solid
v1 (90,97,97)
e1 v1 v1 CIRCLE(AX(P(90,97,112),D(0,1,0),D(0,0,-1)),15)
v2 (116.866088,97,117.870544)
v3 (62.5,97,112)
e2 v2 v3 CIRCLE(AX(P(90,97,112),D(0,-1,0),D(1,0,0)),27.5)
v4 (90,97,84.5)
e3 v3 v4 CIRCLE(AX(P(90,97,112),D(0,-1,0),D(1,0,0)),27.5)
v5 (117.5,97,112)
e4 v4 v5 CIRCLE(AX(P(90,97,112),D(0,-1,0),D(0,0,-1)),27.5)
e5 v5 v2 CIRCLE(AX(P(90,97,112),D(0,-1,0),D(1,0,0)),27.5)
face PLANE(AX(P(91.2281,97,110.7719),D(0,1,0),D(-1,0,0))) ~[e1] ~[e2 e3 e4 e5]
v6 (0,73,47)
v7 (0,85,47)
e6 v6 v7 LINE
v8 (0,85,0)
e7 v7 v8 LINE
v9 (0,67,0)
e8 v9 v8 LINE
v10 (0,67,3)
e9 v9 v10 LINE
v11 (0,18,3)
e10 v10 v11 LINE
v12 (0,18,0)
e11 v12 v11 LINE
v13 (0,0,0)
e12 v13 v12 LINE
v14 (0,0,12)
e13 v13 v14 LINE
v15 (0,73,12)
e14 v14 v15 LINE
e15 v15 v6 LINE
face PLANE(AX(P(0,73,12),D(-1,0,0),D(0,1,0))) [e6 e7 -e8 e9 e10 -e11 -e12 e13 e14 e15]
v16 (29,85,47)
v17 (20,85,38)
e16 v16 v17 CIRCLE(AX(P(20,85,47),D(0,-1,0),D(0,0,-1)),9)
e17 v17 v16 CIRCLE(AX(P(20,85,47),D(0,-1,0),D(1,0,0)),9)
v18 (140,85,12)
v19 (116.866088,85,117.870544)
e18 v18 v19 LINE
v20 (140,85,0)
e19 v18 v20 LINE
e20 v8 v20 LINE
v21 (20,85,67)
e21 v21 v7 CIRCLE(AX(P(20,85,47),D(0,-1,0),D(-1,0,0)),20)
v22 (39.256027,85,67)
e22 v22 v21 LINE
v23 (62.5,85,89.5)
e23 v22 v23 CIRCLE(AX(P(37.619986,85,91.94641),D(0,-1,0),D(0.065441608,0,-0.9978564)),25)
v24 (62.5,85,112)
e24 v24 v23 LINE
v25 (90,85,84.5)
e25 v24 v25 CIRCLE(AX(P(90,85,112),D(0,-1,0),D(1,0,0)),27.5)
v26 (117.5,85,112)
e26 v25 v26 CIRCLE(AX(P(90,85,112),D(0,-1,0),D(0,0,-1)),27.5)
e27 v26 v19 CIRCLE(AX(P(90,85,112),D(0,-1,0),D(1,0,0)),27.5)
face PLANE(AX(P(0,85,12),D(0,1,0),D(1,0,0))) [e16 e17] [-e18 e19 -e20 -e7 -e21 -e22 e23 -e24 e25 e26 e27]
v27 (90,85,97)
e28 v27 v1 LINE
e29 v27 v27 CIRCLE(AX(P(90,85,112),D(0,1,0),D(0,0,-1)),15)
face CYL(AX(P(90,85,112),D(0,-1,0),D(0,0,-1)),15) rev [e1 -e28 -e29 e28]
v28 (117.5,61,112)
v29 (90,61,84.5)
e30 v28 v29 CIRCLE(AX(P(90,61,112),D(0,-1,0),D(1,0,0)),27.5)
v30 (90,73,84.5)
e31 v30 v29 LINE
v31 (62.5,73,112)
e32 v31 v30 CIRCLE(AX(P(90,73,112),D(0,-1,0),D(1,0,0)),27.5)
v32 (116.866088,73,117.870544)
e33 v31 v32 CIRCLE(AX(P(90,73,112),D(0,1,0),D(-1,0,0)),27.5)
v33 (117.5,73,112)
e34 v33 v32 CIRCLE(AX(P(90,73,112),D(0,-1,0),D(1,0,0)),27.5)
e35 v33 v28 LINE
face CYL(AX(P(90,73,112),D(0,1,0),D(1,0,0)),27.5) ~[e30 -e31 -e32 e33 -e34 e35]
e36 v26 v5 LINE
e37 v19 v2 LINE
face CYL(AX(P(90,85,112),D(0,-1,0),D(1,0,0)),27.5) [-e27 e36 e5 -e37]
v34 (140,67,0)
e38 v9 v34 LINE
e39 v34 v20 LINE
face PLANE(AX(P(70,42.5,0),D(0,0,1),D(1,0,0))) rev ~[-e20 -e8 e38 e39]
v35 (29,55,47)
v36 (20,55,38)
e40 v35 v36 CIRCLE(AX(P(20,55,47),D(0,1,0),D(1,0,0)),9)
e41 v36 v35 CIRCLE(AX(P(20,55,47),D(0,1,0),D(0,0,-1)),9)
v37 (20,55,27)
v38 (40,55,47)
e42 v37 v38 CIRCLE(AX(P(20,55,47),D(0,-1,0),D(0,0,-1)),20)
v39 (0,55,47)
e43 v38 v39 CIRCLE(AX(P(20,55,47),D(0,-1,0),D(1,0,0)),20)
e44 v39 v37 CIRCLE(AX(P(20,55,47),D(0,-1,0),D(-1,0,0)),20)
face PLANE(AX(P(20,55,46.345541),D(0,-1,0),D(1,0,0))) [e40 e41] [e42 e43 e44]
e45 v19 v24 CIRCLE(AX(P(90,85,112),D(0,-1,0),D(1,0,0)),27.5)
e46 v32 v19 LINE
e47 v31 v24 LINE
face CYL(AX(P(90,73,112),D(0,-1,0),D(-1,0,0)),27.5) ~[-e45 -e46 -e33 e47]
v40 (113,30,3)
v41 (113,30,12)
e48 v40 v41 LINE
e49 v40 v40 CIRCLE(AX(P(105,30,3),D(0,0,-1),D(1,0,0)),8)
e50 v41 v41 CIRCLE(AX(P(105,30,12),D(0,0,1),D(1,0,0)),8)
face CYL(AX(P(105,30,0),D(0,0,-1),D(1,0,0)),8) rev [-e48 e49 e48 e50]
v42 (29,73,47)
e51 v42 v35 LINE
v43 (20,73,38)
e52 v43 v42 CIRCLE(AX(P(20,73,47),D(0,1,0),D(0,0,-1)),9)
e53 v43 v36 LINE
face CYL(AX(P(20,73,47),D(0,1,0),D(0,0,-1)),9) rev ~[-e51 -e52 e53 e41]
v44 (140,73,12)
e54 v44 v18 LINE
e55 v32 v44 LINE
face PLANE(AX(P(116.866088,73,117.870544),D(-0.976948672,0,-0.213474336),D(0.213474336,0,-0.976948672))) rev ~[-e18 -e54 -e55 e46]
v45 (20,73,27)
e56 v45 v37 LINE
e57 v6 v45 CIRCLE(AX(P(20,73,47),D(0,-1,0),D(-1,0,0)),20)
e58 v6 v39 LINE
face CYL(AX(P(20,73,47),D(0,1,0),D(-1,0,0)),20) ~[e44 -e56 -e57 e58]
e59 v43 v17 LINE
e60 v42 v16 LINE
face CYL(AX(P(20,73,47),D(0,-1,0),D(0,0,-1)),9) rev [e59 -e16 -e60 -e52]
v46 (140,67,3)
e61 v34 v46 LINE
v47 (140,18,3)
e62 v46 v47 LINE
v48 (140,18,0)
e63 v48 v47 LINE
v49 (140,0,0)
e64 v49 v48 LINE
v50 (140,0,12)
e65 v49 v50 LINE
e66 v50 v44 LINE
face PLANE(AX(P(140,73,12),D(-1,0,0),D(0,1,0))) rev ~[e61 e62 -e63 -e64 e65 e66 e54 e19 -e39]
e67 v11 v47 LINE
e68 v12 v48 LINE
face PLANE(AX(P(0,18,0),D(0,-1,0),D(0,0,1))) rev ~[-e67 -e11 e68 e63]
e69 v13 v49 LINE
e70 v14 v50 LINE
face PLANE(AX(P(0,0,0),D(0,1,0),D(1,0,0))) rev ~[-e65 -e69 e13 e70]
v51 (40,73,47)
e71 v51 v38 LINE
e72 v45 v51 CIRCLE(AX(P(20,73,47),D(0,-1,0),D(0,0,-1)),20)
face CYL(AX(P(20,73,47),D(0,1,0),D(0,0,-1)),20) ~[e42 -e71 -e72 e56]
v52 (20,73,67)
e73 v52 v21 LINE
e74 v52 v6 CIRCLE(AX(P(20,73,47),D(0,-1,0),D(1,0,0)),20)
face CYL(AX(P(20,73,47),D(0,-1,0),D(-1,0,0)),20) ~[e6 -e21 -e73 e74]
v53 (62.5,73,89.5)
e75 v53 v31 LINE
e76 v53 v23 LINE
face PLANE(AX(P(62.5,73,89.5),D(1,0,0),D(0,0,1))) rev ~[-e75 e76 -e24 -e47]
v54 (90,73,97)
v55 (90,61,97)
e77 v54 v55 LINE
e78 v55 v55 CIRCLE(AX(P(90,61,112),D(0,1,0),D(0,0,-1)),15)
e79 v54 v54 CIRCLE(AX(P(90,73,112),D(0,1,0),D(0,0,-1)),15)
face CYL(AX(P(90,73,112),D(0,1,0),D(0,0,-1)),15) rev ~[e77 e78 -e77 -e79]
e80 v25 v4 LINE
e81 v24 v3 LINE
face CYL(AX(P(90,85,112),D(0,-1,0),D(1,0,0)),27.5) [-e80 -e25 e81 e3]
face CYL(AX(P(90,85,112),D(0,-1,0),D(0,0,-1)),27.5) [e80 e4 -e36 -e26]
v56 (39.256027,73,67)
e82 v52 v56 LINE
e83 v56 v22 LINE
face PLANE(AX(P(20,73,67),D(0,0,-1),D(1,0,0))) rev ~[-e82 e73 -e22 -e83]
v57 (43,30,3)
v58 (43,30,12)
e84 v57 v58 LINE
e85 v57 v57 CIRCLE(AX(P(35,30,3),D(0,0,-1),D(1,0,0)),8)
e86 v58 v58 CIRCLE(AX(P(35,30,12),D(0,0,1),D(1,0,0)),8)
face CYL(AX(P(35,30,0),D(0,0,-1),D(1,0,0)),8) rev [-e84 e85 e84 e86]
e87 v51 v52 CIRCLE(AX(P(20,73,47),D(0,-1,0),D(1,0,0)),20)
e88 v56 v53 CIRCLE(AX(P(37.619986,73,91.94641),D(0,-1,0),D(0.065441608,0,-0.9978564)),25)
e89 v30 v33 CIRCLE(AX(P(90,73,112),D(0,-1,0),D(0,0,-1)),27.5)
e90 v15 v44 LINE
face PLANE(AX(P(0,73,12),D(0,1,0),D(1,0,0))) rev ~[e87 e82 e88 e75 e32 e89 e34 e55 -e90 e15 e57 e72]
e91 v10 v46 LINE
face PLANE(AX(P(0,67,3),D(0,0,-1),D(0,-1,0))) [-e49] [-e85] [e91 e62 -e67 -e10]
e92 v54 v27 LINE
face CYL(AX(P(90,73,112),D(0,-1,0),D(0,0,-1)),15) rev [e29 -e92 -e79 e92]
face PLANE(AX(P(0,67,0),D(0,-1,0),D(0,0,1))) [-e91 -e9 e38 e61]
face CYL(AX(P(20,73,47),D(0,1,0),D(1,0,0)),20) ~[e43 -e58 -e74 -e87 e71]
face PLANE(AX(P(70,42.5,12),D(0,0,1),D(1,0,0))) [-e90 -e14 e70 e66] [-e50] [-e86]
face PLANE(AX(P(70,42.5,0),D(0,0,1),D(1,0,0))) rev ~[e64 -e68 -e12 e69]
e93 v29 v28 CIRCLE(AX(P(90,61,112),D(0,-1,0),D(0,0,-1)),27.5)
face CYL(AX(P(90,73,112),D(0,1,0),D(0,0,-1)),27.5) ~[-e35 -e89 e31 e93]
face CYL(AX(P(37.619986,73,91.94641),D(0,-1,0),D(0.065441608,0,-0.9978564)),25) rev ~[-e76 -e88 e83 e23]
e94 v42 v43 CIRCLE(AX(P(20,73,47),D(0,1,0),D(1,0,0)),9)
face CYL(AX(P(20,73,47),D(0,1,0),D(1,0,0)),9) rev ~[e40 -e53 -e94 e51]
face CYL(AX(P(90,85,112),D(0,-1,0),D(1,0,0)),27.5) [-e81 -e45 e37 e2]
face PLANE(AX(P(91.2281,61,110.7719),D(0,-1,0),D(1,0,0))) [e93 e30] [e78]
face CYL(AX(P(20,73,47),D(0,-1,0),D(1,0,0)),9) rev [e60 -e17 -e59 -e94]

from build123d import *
from build123d import SkipClean  # not in build123d's __all__

# Parameters (mm, degrees)
F0_W      = 140
F0_H      = 85
F0_R      = 8
F1_DEPTH  = 12
F2_W      = 140
F2_H      = 12
F3_DEPTH  = 130
F5_DEPTH  = 18
F7_DEPTH  = 12
F9_DEPTH  = 25
F10_DEPTH = 25
F11_W     = 49
F11_H     = 3
F12_DEPTH = 140.001


# Not quite as in the source:
# - after a boolean that leaves OpenCascade's solid faulty, fix() repairs it
# - a feature of the source that left no trace in its solid (it failed there, or was rolled back) is left out
# - a pattern or mirror of a feature is missing from the dataset's text; its kind, count and spacing are read off the source's solid


with BuildPart() as f1:
    # F0 (on Top) → F1 (new body)
    with BuildSketch(Plane.XY):
        with Locations((70, 42.5)):
            Rectangle(F0_W, F0_H)
        with Locations((35, 30)):
            Circle(F0_R, mode=Mode.SUBTRACT)
        with Locations((105, 30)):
            Circle(F0_R, mode=Mode.SUBTRACT)
    extrude(amount=F1_DEPTH)

    # F2 (on face) → F3 (join)
    with BuildSketch(Plane.XY.offset(12)):
        with Locations((70, 79)):
            Rectangle(F2_W, F2_H)
    extrude(amount=F3_DEPTH)

    # F4 (on face) → F5 (join)
    with BuildSketch(Plane.XZ.offset(-73)):
        with BuildLine():
            ThreePointArc((40, 47), (20, 67), (0, 47))
            ThreePointArc((0, 47), (5.8578643763, 32.8578643763), (20, 27))
            ThreePointArc((20, 27), (34.1421356237, 32.8578643763), (40, 47))
        make_face()
        with BuildLine():
            ThreePointArc((29, 47), (26.3639610307, 40.6360389693), (20, 38))
            ThreePointArc((20, 38), (13.6360389693, 53.3639610307), (29, 47))
        make_face(mode=Mode.SUBTRACT)
    extrude(amount=F5_DEPTH)

    # F6 (on face) → F7 (join)
    with BuildSketch(Plane.XZ.offset(-73)):
        with BuildLine():
            ThreePointArc((117.5, 112), (70.5545635174, 131.4454364826), (90, 84.5))
            ThreePointArc((90, 84.5), (109.4454364826, 92.5545635174), (117.5, 112))
        make_face()
        with BuildLine():
            ThreePointArc((105, 112), (100.6066017178, 101.3933982822), (90, 97))
            ThreePointArc((90, 97), (79.3933982822, 122.6066017178), (105, 112))
        make_face(mode=Mode.SUBTRACT)
    f7 = extrude(amount=F7_DEPTH)

    # F7_copies: F7 across plane
    add(f7.mirror(Plane.ZX.offset(79)), clean=False)

    # F8 (on face) → F9 (cut)
    with BuildSketch(Plane.XZ.offset(-73)):
        with BuildLine():
            Line((62.5, 89.5), (62.5, 112))
            ThreePointArc((62.5, 112), (87.0476647591, 139.3410628291), (116.8660884819, 117.8705442409))
            Line((116.8660884819, 117.8705442409), (140, 12))
            Line((140, 12), (140, 142))
            Line((140, 142), (0, 142))
            Line((0, 142), (0, 47))
            ThreePointArc((0, 47), (5.8578643763, 61.1421356237), (20, 67))
            Line((20, 67), (35.9839461744, 67))
            Line((35.9839461744, 67), (39.2560265726, 67))
            ThreePointArc((39.2560265726, 67), (55.0078493135, 73.9836089388), (62.5, 89.5))
        make_face()
    with SkipClean():  # cleaning this boolean's faces spoils the solid; the shape is the same uncleaned
        extrude(amount=-F9_DEPTH, mode=Mode.SUBTRACT)

    # F10 (cut): faces of the model
    f10_faces = [f1.faces().sort_by_distance(p)[0] for p in [
        (90, 73, 112),
        (20, 73, 47),
    ]]
    extrude(f10_faces, amount=-F10_DEPTH, mode=Mode.SUBTRACT)

    add(f1.part.fix(), mode=Mode.REPLACE)

    # F11 (on face) → F12 (cut, through all)
    with BuildSketch(Plane(origin=(0, 0, 0), x_dir=(0, -1, 0), z_dir=(-1, 0, 0))):
        with Locations((-42.5, 1.5)):
            Rectangle(F11_W, F11_H)
    extrude(amount=-F12_DEPTH, mode=Mode.SUBTRACT)


solid = f1.part
